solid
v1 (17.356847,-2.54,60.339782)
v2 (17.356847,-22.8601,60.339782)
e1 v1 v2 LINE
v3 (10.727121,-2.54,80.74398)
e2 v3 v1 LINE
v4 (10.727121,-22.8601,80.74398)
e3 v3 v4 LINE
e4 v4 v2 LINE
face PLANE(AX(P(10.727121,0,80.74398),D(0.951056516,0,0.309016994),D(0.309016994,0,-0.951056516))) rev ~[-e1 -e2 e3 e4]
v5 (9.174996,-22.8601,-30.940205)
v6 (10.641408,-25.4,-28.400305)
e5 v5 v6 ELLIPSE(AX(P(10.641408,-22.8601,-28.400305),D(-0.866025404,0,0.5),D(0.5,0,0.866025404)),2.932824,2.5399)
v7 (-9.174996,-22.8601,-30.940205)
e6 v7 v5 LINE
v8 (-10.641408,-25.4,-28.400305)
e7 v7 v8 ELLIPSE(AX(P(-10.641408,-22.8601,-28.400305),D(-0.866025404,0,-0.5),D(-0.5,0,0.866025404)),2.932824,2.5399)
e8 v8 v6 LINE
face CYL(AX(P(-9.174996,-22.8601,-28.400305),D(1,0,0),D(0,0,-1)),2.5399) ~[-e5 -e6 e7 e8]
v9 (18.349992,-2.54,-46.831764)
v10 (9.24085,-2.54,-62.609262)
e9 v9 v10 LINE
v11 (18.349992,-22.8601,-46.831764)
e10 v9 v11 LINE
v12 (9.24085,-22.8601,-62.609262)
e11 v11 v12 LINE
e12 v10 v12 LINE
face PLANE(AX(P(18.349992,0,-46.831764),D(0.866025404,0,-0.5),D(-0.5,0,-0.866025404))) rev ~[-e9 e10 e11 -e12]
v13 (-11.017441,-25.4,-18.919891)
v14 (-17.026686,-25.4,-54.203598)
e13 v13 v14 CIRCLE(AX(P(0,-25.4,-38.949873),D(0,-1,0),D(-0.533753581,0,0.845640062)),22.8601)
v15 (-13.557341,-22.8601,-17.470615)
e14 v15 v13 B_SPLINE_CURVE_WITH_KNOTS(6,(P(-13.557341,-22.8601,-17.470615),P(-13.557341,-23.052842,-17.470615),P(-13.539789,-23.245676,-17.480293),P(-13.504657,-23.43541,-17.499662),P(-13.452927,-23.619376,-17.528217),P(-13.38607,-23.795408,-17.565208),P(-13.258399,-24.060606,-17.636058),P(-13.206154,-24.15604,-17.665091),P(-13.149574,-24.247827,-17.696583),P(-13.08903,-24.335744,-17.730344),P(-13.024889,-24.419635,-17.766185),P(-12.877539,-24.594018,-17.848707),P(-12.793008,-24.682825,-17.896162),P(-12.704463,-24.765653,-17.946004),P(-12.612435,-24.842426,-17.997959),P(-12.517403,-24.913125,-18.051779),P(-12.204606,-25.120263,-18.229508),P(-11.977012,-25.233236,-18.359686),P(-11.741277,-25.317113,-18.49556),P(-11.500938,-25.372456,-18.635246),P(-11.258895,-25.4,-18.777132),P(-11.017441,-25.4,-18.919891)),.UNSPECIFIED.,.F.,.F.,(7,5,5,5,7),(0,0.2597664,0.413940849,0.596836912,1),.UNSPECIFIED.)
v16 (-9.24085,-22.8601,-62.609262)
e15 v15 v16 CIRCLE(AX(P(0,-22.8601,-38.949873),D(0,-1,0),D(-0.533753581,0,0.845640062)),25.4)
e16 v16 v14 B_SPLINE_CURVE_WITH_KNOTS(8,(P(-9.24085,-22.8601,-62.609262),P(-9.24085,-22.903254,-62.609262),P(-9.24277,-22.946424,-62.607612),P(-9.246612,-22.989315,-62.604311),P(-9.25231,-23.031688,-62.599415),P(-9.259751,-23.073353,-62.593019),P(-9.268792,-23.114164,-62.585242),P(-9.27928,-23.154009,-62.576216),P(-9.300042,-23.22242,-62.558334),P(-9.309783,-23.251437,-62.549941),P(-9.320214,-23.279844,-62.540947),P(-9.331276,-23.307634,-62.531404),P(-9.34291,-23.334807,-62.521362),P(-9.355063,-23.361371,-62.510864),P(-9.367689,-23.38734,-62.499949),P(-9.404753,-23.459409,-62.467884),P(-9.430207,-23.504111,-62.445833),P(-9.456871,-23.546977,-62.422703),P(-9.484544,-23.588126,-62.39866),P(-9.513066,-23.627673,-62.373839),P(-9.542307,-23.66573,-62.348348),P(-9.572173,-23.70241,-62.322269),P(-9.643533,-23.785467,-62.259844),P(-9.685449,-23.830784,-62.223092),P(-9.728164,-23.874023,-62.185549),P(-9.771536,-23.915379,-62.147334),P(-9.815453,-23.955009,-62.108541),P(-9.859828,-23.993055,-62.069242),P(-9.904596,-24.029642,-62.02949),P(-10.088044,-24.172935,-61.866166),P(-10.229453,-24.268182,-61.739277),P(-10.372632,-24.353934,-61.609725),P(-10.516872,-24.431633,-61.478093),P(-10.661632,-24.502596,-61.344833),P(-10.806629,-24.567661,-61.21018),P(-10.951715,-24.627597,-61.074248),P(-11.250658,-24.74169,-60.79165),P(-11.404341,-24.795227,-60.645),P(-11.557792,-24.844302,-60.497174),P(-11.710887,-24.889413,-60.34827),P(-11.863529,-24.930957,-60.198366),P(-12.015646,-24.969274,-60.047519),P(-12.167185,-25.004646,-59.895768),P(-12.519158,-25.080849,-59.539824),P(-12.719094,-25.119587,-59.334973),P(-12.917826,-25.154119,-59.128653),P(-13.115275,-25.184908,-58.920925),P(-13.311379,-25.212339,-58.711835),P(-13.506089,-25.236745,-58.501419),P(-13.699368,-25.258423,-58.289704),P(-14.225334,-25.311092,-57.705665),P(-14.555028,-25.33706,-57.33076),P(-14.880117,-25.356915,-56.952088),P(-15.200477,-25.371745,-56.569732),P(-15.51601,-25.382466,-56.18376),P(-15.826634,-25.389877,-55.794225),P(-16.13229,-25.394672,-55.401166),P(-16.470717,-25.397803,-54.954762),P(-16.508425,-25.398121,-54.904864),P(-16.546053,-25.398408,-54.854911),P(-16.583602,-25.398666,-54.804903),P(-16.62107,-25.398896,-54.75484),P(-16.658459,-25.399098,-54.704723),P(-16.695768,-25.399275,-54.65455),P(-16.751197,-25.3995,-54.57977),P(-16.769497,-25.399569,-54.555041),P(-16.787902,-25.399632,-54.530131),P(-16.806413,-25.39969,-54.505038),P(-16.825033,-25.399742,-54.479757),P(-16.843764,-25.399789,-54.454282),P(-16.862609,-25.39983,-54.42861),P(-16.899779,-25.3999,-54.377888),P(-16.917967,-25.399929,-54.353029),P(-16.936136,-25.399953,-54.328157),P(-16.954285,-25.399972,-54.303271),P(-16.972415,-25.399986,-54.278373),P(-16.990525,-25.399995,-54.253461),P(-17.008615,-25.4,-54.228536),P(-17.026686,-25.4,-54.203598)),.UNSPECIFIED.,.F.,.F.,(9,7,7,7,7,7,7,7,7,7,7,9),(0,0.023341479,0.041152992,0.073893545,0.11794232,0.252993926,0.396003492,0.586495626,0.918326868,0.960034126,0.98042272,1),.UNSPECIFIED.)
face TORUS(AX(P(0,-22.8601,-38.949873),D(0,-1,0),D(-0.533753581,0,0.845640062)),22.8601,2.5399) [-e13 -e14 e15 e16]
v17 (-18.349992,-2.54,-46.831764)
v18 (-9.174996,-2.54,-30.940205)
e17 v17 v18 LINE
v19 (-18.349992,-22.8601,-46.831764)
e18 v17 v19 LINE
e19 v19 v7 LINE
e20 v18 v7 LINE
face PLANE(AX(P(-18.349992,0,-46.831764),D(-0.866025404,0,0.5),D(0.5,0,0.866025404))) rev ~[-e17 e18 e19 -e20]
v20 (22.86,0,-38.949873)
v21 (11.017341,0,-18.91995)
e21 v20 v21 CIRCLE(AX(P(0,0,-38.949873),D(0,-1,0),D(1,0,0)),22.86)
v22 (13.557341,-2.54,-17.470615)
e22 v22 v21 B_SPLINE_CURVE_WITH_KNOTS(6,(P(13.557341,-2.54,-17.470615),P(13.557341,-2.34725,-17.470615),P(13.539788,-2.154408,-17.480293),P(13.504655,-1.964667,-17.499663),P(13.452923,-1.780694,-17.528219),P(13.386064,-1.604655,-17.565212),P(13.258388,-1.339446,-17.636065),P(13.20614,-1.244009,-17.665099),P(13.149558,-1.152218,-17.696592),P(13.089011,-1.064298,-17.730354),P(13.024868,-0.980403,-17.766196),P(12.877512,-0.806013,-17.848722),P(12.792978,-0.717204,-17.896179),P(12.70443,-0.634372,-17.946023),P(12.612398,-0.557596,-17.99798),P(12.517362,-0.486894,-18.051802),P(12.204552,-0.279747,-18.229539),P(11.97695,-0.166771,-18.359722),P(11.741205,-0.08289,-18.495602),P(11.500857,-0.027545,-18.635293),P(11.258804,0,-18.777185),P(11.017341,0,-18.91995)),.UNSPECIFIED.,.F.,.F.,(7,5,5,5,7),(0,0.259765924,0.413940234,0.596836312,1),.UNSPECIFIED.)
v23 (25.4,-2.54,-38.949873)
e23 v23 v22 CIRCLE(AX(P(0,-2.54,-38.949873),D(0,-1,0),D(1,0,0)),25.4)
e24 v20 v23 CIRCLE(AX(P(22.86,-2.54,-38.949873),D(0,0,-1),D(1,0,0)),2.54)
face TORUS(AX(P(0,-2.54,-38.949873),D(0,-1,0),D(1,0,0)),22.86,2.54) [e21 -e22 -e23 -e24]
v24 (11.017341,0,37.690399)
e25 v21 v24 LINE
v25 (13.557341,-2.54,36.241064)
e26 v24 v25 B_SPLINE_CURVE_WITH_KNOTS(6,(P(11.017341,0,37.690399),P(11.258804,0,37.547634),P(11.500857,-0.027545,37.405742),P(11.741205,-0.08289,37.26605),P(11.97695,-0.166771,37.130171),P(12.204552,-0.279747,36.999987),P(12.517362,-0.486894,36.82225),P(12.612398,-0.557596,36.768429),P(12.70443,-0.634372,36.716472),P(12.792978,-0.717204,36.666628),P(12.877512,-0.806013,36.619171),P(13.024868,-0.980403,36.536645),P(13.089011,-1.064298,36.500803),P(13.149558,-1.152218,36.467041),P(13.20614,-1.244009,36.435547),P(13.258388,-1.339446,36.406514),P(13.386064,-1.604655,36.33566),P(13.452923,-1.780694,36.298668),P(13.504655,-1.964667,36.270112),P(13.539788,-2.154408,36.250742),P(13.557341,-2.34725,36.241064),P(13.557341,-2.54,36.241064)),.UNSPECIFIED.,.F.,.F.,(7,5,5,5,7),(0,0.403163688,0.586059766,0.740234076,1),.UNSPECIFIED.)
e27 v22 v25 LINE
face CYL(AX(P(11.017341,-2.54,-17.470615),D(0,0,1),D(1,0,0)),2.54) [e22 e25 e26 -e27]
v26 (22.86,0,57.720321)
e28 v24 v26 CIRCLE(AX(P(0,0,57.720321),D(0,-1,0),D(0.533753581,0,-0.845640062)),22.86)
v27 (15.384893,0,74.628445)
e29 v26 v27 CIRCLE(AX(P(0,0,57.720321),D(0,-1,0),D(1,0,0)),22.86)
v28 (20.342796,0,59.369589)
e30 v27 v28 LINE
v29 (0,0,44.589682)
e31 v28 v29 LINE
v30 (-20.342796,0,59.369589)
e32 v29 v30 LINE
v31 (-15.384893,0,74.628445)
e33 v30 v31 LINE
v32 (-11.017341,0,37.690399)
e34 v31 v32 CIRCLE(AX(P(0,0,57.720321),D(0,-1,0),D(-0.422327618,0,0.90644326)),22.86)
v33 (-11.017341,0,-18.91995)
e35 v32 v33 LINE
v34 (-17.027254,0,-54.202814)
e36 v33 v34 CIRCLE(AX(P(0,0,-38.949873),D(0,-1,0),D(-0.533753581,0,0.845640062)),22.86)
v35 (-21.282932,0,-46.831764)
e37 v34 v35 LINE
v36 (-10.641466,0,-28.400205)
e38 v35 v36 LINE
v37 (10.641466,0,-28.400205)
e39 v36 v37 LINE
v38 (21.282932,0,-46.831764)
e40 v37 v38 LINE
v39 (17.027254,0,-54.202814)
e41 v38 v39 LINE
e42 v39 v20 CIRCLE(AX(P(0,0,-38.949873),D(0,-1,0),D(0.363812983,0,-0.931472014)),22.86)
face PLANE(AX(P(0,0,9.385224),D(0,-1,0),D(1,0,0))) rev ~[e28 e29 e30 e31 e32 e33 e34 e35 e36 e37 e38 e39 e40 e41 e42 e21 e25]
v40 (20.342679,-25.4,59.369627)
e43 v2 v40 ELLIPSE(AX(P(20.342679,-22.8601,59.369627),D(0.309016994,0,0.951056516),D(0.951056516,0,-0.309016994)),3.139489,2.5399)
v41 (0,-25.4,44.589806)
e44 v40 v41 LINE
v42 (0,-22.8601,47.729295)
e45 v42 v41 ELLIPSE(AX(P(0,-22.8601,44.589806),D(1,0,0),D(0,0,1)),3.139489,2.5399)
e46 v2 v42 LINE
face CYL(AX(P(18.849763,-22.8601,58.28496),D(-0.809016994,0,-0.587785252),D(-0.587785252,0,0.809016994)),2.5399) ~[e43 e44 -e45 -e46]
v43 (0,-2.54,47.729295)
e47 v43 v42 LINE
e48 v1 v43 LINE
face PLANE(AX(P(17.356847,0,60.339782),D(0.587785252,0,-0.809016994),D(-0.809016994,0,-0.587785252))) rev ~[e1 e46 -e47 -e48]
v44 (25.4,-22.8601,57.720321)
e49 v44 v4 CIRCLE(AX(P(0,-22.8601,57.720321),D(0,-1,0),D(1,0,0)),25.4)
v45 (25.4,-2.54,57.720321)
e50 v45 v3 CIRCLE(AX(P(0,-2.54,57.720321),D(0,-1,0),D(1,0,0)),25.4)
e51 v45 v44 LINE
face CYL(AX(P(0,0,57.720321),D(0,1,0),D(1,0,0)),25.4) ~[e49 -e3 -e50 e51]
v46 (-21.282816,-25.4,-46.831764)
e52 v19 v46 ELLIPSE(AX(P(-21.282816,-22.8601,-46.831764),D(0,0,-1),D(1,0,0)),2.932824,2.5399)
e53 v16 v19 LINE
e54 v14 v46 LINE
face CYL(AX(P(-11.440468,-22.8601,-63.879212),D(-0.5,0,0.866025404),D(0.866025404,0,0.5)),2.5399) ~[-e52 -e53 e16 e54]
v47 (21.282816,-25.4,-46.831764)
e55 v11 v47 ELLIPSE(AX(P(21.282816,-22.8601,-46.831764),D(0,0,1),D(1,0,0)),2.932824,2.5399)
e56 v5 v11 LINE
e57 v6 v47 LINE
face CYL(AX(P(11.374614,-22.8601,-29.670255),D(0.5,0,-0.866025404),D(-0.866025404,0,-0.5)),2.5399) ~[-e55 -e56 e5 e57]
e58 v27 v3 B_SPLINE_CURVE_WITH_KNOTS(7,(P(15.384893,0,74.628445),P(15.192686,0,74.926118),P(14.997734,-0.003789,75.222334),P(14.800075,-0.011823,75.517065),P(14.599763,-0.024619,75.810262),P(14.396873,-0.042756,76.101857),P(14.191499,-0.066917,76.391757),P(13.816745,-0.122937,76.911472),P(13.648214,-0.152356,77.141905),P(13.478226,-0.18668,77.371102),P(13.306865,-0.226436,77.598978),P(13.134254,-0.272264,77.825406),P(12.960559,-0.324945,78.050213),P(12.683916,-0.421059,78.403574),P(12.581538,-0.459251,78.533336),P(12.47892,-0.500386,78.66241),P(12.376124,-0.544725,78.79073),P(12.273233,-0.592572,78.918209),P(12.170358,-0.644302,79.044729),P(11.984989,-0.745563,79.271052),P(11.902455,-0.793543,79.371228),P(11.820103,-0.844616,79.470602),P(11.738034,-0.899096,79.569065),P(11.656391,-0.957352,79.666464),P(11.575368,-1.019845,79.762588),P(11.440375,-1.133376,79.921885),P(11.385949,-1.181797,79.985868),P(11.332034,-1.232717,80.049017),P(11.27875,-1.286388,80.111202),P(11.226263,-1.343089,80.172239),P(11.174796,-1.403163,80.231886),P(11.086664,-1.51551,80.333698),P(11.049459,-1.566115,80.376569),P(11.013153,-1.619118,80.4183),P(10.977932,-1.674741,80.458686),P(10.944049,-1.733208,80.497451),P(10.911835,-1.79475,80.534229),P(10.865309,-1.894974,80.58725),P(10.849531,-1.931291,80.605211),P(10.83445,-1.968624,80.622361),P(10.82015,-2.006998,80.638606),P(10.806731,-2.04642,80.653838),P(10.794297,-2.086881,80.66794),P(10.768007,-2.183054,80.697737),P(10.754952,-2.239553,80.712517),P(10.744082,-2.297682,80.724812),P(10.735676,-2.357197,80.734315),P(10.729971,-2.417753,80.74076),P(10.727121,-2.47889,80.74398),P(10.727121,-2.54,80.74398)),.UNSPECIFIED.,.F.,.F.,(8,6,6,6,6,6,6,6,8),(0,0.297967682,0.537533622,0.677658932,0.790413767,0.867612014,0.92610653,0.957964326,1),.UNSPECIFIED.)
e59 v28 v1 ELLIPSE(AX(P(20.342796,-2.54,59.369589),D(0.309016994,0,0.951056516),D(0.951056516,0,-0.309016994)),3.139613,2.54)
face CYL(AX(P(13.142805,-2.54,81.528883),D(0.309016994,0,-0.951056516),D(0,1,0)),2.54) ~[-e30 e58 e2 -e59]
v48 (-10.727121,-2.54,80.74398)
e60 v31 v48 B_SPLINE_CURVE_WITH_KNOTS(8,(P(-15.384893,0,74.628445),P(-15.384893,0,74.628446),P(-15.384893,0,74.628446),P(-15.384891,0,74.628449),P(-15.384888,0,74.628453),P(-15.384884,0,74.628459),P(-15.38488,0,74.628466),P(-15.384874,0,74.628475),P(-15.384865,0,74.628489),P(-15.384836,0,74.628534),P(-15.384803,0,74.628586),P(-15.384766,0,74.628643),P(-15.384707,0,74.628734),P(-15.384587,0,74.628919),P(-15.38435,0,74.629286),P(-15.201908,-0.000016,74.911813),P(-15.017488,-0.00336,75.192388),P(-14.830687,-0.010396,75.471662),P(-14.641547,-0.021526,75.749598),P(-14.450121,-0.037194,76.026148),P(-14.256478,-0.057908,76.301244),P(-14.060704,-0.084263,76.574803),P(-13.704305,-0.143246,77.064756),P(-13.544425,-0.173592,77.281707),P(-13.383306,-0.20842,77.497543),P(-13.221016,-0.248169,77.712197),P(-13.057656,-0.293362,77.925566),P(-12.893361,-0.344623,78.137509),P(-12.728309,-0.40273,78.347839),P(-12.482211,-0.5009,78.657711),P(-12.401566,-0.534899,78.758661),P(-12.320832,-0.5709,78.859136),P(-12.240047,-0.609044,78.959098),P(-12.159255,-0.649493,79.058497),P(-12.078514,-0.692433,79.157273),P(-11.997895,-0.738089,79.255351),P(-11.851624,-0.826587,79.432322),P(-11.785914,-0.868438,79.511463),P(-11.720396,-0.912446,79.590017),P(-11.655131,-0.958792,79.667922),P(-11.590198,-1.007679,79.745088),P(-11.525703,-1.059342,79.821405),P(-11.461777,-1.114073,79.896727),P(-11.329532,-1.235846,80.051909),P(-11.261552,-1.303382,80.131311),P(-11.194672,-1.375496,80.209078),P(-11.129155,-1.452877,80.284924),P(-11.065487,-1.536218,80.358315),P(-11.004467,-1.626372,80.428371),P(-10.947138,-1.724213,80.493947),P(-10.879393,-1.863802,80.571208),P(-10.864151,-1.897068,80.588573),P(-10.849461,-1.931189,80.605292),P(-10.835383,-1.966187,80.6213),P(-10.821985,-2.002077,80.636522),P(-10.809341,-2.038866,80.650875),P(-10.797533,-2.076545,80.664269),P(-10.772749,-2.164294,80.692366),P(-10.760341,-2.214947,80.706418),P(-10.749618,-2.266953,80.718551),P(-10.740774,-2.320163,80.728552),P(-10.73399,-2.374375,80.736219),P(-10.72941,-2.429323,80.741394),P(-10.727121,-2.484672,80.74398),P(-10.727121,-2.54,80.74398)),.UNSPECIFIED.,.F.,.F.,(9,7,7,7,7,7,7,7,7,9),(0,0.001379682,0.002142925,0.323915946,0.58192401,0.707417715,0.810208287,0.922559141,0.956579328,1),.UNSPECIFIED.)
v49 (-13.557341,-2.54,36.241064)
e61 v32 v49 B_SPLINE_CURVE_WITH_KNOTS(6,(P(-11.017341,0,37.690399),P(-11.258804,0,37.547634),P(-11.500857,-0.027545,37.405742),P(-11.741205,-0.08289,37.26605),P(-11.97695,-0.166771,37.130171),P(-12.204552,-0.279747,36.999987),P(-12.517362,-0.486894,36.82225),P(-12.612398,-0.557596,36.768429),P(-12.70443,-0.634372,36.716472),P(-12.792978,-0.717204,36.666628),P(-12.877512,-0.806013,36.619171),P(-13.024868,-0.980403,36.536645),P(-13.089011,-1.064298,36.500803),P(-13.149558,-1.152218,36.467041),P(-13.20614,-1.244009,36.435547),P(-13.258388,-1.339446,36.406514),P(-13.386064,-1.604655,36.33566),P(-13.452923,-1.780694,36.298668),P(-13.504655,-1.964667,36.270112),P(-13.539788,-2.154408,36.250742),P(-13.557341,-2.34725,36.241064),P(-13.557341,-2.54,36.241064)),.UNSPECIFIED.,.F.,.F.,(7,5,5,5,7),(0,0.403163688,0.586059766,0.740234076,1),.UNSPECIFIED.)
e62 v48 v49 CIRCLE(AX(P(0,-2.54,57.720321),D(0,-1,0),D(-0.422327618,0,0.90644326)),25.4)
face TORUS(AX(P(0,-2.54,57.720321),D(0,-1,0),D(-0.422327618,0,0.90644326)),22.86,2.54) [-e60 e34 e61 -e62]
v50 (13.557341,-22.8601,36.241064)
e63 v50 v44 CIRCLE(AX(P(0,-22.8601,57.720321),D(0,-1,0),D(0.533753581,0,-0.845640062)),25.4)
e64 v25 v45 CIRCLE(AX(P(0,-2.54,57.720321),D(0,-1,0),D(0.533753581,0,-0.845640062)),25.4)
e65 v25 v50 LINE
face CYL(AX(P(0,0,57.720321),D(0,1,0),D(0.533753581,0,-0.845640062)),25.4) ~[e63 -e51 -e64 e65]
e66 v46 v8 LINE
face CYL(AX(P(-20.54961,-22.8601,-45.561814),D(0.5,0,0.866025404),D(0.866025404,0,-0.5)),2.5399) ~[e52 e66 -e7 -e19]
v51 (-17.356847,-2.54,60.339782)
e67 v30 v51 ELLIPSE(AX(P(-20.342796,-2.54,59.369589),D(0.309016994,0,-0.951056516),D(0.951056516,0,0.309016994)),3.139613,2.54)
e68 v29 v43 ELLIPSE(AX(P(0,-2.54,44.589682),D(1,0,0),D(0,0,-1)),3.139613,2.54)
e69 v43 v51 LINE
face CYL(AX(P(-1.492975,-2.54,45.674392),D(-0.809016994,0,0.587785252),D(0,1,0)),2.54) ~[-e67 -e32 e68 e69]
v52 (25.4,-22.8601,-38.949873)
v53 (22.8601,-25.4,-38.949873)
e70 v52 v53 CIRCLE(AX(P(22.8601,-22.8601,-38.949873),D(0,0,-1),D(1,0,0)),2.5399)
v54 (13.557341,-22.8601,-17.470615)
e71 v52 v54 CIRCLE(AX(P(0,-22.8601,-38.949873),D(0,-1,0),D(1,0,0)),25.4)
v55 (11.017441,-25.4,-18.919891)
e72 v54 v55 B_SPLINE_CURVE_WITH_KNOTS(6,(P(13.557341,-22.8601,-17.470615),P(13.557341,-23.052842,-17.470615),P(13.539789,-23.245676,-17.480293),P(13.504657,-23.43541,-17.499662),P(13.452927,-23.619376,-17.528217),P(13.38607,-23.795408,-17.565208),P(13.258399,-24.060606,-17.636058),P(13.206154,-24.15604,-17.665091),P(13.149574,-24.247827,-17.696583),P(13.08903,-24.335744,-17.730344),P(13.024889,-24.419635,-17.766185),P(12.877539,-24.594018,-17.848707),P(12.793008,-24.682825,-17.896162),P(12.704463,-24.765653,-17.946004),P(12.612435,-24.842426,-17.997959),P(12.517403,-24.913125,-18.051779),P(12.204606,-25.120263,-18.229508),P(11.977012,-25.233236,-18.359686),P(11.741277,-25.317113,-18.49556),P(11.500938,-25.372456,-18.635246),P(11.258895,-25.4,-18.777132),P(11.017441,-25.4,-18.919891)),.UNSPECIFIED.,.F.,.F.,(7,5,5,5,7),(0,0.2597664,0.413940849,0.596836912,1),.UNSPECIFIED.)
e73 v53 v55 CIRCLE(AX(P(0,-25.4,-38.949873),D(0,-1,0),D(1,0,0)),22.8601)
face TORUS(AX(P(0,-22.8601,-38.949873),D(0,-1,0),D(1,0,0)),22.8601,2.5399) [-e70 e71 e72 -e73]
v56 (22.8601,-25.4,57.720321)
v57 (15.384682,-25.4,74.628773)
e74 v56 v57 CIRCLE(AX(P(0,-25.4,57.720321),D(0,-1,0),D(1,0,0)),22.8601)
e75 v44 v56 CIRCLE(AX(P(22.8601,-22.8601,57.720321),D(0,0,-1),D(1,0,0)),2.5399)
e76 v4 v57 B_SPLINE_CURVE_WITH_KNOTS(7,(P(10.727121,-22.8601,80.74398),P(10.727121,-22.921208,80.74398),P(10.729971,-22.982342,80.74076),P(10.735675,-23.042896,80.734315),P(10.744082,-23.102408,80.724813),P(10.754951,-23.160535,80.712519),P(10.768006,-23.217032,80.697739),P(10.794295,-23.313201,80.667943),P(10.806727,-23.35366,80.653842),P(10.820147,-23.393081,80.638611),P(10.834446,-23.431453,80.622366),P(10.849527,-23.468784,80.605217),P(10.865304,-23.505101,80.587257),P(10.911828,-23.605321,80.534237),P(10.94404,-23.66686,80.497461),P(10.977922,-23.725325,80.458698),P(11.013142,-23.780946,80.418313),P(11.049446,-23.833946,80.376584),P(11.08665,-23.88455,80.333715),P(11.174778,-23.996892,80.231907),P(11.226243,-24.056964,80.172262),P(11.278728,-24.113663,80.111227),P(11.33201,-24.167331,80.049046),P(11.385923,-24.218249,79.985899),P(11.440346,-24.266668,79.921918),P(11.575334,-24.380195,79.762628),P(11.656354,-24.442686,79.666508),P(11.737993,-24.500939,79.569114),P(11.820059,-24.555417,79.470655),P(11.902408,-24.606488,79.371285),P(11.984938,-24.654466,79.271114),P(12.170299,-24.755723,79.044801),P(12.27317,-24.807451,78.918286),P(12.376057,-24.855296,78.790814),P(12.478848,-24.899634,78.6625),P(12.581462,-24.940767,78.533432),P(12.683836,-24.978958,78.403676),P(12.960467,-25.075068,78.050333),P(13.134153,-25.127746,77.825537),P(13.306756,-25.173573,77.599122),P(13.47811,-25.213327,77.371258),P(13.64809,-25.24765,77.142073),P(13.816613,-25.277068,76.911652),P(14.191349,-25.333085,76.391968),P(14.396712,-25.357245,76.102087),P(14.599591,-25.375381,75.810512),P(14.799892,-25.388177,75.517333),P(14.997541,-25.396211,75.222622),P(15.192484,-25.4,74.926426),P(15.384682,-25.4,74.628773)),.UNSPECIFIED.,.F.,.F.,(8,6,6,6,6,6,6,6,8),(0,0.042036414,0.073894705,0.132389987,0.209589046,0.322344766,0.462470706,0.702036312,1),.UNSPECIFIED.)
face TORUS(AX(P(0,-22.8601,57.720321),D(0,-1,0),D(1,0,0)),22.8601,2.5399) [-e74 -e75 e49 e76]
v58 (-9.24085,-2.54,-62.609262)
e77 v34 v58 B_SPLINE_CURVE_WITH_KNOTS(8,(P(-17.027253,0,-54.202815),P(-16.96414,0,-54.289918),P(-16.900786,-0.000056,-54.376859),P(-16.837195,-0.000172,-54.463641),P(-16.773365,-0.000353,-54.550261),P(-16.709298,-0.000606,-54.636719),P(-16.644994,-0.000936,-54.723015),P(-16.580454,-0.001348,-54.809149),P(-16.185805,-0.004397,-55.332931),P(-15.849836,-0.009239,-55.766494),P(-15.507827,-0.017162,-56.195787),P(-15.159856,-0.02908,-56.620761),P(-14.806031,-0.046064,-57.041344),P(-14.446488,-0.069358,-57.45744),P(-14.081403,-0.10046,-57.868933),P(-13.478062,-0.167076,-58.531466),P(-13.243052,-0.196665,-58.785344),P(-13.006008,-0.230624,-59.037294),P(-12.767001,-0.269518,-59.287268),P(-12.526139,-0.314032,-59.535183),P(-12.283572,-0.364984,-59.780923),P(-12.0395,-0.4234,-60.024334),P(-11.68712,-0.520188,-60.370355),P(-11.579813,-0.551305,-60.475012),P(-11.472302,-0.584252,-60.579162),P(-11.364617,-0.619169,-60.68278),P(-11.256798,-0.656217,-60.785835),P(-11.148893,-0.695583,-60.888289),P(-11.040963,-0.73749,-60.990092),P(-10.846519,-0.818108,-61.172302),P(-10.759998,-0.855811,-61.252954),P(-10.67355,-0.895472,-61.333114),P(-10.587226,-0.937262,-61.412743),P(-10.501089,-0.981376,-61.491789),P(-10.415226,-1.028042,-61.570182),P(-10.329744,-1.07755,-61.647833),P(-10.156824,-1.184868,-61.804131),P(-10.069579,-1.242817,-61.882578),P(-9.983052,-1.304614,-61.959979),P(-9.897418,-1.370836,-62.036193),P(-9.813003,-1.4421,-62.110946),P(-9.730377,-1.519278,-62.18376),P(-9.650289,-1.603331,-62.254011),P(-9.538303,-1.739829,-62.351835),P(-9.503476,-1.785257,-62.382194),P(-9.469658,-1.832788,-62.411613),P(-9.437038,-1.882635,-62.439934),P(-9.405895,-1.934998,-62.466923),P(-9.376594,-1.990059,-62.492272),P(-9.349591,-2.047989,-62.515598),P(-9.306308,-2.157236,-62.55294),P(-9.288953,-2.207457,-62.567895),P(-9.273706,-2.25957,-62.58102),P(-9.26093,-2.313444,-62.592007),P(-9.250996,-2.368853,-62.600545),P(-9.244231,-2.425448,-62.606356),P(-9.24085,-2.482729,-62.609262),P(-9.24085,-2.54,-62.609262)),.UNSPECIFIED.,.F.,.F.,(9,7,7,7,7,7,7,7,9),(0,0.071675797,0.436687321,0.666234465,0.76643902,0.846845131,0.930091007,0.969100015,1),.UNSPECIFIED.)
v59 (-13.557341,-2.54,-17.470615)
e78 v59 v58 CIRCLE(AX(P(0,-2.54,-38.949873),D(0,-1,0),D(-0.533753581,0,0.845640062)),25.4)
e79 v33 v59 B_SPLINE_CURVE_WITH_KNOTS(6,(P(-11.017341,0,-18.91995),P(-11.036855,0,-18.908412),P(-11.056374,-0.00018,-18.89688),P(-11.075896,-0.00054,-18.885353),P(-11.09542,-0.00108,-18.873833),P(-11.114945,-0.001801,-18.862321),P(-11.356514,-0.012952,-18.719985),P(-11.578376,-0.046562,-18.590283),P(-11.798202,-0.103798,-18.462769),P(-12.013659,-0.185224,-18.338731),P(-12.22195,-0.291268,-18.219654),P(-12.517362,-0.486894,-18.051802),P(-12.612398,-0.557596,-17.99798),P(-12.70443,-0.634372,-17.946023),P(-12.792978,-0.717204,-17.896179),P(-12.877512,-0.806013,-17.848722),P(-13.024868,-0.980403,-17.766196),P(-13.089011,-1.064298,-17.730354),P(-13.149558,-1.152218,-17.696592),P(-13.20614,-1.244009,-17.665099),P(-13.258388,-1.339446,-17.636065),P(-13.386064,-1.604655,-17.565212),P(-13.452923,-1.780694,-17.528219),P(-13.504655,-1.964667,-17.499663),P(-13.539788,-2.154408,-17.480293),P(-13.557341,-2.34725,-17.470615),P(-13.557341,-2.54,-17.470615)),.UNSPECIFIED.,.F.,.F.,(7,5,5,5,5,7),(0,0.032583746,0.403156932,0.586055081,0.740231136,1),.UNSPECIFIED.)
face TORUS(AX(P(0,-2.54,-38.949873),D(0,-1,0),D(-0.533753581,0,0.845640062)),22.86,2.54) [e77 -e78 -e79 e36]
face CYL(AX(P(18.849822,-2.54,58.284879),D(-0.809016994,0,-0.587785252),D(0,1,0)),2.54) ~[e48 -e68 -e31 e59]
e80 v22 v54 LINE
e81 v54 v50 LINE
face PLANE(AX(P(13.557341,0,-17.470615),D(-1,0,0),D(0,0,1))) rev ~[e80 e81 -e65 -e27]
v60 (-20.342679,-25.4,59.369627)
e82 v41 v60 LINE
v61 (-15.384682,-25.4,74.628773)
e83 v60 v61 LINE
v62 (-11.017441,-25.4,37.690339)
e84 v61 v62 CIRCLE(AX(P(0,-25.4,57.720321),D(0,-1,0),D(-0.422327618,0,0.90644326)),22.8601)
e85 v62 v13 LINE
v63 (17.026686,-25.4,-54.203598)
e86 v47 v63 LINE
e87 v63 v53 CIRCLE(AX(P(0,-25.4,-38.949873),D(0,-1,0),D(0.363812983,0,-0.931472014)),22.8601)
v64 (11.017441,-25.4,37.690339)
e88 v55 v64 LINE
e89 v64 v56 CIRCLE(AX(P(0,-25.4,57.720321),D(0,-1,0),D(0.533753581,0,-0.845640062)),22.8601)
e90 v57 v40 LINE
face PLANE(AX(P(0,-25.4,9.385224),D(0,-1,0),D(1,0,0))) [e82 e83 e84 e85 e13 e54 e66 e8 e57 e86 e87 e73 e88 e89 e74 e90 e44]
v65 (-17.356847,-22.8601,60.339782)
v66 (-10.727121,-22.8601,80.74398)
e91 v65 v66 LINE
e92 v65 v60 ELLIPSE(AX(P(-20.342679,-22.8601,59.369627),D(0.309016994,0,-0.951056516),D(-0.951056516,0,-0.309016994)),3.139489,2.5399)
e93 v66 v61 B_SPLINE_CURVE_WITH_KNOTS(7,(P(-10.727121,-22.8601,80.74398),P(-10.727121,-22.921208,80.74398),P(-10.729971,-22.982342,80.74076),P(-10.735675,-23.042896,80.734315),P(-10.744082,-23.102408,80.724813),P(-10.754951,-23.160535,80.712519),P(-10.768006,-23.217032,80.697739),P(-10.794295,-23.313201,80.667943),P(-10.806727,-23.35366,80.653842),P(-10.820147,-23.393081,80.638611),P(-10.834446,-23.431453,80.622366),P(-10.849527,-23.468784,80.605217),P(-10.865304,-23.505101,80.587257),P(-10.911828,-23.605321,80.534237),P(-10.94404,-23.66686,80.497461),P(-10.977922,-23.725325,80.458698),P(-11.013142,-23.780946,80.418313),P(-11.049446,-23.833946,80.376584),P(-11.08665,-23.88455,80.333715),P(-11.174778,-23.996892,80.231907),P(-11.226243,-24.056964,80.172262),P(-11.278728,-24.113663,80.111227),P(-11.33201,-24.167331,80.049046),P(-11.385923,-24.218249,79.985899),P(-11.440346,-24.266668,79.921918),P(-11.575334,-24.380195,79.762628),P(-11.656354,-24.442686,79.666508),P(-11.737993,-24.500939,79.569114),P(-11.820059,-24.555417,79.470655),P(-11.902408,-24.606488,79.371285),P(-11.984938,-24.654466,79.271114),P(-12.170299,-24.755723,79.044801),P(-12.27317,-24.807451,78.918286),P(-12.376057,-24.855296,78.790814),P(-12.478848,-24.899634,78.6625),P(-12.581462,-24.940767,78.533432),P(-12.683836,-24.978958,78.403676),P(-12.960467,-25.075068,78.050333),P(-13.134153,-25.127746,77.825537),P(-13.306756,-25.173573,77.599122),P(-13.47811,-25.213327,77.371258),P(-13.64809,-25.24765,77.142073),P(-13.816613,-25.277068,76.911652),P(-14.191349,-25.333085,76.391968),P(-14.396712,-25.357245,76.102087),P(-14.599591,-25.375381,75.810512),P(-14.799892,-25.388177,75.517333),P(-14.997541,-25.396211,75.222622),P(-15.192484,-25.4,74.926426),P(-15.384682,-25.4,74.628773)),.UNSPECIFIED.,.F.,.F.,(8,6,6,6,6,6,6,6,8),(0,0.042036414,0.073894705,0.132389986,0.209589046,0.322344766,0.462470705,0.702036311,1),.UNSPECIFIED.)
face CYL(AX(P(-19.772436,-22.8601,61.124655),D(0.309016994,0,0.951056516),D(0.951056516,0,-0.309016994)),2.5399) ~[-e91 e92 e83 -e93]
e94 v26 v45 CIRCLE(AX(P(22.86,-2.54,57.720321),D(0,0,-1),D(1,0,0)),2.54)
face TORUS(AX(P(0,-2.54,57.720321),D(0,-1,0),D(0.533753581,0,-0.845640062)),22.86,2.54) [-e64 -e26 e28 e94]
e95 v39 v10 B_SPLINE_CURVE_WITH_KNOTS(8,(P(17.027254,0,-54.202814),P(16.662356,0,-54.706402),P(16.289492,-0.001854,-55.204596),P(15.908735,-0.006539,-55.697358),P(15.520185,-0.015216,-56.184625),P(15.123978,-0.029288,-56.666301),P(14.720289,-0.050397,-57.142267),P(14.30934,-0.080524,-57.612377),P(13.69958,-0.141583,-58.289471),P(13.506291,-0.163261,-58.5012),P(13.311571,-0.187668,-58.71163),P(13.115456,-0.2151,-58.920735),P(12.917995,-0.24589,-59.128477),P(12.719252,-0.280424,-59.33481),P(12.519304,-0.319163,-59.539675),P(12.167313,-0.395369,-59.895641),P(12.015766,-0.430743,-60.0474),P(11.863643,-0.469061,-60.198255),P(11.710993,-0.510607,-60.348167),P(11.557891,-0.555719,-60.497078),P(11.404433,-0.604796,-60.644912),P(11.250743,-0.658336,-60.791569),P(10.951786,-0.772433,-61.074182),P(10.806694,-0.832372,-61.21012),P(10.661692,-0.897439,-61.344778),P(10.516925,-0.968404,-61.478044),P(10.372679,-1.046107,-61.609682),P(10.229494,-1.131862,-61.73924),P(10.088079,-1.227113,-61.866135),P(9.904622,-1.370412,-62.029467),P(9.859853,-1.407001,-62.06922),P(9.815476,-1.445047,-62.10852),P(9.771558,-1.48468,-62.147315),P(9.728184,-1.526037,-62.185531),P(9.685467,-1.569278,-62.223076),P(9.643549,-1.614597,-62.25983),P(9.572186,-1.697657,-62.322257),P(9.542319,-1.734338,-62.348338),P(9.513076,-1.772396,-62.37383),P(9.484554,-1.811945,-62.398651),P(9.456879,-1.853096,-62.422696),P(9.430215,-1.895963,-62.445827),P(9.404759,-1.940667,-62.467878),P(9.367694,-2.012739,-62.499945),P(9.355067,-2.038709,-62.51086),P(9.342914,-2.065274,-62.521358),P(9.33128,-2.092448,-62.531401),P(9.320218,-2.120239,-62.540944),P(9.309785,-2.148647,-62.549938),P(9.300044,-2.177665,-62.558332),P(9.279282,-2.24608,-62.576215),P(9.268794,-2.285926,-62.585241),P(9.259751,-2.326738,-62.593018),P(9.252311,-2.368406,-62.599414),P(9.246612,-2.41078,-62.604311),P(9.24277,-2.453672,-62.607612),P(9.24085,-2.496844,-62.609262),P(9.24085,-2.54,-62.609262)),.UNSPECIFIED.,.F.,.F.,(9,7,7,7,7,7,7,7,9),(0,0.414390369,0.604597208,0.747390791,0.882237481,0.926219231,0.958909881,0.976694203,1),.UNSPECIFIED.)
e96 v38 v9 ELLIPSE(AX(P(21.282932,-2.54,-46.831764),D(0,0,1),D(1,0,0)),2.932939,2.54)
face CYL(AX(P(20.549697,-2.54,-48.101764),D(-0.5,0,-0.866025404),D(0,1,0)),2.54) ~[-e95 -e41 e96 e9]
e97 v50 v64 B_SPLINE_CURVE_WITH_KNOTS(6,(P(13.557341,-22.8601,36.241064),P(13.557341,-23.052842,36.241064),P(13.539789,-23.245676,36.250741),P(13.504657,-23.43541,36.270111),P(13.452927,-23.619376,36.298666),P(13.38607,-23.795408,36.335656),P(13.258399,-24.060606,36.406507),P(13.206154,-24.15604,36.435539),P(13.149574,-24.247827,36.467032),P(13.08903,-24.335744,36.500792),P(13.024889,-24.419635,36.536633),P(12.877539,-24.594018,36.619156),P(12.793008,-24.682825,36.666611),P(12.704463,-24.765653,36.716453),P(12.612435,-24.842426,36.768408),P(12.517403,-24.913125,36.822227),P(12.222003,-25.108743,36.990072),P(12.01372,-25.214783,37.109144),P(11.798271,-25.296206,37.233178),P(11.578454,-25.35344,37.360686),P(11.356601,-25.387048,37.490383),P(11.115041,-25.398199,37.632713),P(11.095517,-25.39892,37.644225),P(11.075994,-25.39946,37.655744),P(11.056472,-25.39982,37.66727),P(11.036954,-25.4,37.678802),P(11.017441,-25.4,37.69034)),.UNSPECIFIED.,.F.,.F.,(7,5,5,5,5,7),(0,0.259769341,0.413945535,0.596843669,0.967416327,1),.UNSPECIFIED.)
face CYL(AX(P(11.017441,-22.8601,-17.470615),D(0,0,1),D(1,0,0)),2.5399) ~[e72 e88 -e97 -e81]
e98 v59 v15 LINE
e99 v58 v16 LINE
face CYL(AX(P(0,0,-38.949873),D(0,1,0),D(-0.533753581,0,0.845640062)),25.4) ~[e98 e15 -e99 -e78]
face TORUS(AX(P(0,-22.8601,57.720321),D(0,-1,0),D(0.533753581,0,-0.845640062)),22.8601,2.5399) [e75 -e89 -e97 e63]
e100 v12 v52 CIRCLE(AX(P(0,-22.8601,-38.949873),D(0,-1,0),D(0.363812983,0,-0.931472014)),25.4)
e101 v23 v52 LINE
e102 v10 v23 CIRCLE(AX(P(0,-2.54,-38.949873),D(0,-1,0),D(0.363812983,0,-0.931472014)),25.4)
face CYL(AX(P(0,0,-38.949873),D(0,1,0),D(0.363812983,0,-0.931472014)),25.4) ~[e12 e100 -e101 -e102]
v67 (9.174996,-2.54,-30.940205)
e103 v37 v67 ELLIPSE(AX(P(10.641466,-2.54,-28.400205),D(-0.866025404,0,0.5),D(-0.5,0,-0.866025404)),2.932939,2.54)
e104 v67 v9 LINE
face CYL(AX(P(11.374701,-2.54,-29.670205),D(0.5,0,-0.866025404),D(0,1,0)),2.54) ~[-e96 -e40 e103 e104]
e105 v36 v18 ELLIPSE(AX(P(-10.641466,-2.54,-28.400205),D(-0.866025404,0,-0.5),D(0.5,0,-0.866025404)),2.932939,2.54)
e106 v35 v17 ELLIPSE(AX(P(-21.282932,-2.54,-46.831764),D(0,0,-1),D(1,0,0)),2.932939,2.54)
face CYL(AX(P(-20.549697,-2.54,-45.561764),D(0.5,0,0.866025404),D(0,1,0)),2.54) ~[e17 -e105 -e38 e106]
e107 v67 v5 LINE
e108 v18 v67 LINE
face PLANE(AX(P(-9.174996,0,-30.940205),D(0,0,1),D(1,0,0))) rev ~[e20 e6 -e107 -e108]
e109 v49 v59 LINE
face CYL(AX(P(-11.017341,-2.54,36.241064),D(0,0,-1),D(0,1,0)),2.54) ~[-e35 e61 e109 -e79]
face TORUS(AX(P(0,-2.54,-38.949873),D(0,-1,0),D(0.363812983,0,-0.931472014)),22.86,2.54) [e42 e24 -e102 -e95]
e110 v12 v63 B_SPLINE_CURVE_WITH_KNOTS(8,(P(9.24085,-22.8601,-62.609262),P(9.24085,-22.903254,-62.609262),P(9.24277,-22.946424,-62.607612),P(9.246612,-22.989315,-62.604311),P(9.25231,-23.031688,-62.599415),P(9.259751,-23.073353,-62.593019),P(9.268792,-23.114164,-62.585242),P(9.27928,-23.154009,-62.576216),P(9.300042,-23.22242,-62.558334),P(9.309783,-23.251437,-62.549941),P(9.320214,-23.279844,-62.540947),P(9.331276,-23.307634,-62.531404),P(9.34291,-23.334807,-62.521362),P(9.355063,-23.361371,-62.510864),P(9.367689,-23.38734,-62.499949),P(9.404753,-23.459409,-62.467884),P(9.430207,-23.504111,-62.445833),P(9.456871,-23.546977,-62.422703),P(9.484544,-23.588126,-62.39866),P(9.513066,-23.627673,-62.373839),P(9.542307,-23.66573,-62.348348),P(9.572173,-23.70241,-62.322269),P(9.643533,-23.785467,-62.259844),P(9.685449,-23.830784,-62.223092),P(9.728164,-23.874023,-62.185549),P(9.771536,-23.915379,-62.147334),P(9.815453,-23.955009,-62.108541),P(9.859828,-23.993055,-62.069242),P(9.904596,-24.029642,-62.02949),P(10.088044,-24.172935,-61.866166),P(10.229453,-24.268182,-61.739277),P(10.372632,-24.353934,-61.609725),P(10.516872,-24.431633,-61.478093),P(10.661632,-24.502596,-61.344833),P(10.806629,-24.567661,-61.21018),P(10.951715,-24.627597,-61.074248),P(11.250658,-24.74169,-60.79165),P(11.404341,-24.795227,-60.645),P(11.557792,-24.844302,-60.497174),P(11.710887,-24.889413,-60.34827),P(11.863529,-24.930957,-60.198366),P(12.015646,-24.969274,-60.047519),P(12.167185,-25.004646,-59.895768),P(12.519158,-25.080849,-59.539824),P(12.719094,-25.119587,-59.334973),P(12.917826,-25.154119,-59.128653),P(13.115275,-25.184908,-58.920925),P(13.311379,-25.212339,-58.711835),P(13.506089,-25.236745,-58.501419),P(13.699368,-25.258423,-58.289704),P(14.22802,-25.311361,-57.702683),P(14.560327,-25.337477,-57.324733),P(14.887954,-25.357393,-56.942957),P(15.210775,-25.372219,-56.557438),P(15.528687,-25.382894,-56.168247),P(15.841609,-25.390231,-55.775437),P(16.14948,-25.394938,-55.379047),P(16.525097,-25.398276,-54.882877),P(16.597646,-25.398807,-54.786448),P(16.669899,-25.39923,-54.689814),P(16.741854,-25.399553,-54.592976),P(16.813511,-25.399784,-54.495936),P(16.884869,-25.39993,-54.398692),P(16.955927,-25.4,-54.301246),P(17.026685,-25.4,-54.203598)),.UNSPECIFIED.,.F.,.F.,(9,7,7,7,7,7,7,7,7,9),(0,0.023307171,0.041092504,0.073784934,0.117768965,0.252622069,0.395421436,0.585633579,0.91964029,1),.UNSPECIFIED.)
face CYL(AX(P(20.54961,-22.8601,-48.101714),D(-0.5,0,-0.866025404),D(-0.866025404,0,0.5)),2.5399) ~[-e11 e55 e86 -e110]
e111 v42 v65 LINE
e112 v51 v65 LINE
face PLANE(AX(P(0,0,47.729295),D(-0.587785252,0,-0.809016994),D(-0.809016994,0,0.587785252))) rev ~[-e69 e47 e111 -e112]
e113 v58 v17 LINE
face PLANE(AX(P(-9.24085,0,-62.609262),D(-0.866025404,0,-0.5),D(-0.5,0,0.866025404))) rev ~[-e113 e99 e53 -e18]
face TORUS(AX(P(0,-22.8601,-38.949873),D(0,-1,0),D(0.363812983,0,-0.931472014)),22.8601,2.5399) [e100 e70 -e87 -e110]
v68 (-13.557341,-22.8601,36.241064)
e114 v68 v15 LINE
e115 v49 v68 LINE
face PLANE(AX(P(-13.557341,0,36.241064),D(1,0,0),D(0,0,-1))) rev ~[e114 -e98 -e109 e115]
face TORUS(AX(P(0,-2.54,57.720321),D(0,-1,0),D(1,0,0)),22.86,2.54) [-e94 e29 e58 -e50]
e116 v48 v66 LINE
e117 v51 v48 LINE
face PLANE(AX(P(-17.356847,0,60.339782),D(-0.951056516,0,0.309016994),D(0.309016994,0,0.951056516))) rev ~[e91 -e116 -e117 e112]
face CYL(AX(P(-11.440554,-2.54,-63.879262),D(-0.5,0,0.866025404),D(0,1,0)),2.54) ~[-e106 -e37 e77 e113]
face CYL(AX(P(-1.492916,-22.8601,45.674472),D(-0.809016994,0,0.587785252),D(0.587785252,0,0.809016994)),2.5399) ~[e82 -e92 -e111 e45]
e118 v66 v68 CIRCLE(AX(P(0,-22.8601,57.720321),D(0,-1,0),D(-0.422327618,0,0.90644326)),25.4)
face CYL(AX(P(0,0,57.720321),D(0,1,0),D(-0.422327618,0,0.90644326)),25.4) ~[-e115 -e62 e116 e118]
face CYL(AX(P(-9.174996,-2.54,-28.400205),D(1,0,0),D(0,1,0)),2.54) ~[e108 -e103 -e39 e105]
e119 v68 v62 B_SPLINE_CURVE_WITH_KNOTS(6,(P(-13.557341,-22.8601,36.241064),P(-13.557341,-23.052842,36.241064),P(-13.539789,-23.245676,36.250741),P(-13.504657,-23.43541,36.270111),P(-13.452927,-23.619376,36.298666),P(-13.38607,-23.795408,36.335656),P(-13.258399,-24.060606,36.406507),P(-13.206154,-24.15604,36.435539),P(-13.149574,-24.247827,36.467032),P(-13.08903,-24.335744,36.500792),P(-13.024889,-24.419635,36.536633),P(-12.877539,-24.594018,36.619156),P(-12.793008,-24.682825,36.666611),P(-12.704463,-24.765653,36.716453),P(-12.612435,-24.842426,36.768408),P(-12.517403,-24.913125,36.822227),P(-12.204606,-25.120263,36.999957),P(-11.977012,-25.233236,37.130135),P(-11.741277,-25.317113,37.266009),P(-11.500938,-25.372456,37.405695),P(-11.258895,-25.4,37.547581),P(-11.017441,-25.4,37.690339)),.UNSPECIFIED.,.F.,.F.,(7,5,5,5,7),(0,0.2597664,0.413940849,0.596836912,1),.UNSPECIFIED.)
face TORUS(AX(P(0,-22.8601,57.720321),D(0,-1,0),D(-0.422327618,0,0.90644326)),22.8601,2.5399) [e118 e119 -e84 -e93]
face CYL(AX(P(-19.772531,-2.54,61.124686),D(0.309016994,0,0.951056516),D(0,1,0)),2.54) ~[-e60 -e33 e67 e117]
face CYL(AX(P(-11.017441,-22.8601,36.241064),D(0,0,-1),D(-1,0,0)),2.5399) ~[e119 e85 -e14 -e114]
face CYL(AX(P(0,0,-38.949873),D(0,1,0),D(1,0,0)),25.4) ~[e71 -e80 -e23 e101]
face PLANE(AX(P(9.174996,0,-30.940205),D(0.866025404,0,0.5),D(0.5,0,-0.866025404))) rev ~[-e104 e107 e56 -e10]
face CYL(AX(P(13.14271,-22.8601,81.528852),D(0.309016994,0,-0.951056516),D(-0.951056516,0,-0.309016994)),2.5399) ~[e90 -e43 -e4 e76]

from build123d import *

# Parameters (mm, degrees)
F1_DEPTH = 25.4
F2_R     = 2.5399
F3_R     = 2.54


# Not quite as in the source:
# - a fillet or chamfer is up to 0.001 mm smaller than in the source, because OpenCascade refuses the exact size


with BuildPart() as f1:
    # F0 (on Front) → F1 (new body)
    with BuildSketch(Plane.XZ):
        with BuildLine():
            ThreePointArc((-13.5573409498, -17.4706149846), (0, -13.5498725689), (13.5573409498, -17.4706149846))
            Line((13.5573409498, -17.4706149846), (13.5573409498, 36.2410636034))
            ThreePointArc((13.5573409498, 36.2410636034), (0, 32.3203211877), (-13.5573409498, 36.2410636034))
            Line((-13.5573409498, 36.2410636034), (-13.5573409498, -17.4706149846))
        make_face()
        with BuildLine():
            ThreePointArc((-13.5573409498, 36.2410636034), (0, 32.3203211877), (13.5573409498, 36.2410636034))
            ThreePointArc((13.5573409498, 36.2410636034), (22.2431614224, 45.4564812533), (25.4, 57.7203211877))
            ThreePointArc((25.4, 57.7203211877), (21.419954319, 71.3711657393), (10.7271214983, 80.7439799838))
            Line((10.7271214983, 80.7439799838), (17.3568471858, 60.3397823797))
            Line((17.3568471858, 60.3397823797), (0, 47.7292947471))
            Line((0, 47.7292947471), (-17.3568471858, 60.3397823797))
            Line((-17.3568471858, 60.3397823797), (-10.7271214983, 80.7439799838))
            ThreePointArc((-10.7271214983, 80.7439799838), (-25.34879032, 59.3324096814), (-13.5573409498, 36.2410636034))
        make_face()
        with BuildLine():
            ThreePointArc((9.2408497758, -62.6092617289), (20.9747179278, -53.2754164625), (25.4, -38.9498725689))
            ThreePointArc((25.4, -38.9498725689), (22.2431614224, -26.6860326345), (13.5573409498, -17.4706149846))
            ThreePointArc((13.5573409498, -17.4706149846), (0, -13.5498725689), (-13.5573409498, -17.4706149846))
            ThreePointArc((-13.5573409498, -17.4706149846), (-25.2846540922, -41.3677781576), (-9.2408497758, -62.6092617289))
            Line((-9.2408497758, -62.6092617289), (-18.3499921745, -46.8317642808))
            Line((-18.3499921745, -46.8317642808), (-9.1749960873, -30.9402048984))
            Line((-9.1749960873, -30.9402048984), (9.1749960873, -30.9402048984))
            Line((9.1749960873, -30.9402048984), (18.3499921745, -46.8317642808))
            Line((18.3499921745, -46.8317642808), (9.2408497758, -62.6092617289))
        make_face()
    extrude(amount=F1_DEPTH)

    # F2 (radius 2.54 in the source; OpenCascade refuses exactly that, so slightly less here)
    f2_edges = [f1.edges().sort_by_distance(p)[0] for p in [
        (-13.762494, -25.4, -38.885985),
        (0, -25.4, -30.940205),
        (13.762494, -25.4, -38.885985),
        (-13.795421, -25.4, -54.720513),
        (13.795421, -25.4, -54.720513),
        (25.284654, -25.4, -41.367778),
        (-25.284654, -25.4, -41.367778),
        (-13.557341, -25.4, 9.385224),
        (-25.34879, -25.4, 59.33241),
        (-8.678424, -25.4, 54.034539),
        (-14.041984, -25.4, 70.541881),
        (14.041984, -25.4, 70.541881),
        (8.678424, -25.4, 54.034539),
        (25.34879, -25.4, 59.33241),
        (13.557341, -25.4, 9.385224),
    ]]
    fillet(f2_edges, radius=F2_R)

    # F3
    f3_edges = [f1.edges().sort_by_distance(p)[0] for p in [
        (25.34879, 0, 59.33241),
        (14.041984, 0, 70.541881),
        (8.678424, 0, 54.034539),
        (-14.041984, 0, 70.541881),
        (-8.678424, 0, 54.034539),
        (-25.34879, 0, 59.33241),
        (13.557341, 0, 9.385224),
        (-13.557341, 0, 9.385224),
        (25.284654, 0, -41.367778),
        (13.762494, 0, -38.885985),
        (13.795421, 0, -54.720513),
        (0, 0, -30.940205),
        (-13.762494, 0, -38.885985),
        (-25.284654, 0, -41.367778),
        (-13.795421, 0, -54.720513),
    ]]
    fillet(f3_edges, radius=F3_R)


solid = f1.part
